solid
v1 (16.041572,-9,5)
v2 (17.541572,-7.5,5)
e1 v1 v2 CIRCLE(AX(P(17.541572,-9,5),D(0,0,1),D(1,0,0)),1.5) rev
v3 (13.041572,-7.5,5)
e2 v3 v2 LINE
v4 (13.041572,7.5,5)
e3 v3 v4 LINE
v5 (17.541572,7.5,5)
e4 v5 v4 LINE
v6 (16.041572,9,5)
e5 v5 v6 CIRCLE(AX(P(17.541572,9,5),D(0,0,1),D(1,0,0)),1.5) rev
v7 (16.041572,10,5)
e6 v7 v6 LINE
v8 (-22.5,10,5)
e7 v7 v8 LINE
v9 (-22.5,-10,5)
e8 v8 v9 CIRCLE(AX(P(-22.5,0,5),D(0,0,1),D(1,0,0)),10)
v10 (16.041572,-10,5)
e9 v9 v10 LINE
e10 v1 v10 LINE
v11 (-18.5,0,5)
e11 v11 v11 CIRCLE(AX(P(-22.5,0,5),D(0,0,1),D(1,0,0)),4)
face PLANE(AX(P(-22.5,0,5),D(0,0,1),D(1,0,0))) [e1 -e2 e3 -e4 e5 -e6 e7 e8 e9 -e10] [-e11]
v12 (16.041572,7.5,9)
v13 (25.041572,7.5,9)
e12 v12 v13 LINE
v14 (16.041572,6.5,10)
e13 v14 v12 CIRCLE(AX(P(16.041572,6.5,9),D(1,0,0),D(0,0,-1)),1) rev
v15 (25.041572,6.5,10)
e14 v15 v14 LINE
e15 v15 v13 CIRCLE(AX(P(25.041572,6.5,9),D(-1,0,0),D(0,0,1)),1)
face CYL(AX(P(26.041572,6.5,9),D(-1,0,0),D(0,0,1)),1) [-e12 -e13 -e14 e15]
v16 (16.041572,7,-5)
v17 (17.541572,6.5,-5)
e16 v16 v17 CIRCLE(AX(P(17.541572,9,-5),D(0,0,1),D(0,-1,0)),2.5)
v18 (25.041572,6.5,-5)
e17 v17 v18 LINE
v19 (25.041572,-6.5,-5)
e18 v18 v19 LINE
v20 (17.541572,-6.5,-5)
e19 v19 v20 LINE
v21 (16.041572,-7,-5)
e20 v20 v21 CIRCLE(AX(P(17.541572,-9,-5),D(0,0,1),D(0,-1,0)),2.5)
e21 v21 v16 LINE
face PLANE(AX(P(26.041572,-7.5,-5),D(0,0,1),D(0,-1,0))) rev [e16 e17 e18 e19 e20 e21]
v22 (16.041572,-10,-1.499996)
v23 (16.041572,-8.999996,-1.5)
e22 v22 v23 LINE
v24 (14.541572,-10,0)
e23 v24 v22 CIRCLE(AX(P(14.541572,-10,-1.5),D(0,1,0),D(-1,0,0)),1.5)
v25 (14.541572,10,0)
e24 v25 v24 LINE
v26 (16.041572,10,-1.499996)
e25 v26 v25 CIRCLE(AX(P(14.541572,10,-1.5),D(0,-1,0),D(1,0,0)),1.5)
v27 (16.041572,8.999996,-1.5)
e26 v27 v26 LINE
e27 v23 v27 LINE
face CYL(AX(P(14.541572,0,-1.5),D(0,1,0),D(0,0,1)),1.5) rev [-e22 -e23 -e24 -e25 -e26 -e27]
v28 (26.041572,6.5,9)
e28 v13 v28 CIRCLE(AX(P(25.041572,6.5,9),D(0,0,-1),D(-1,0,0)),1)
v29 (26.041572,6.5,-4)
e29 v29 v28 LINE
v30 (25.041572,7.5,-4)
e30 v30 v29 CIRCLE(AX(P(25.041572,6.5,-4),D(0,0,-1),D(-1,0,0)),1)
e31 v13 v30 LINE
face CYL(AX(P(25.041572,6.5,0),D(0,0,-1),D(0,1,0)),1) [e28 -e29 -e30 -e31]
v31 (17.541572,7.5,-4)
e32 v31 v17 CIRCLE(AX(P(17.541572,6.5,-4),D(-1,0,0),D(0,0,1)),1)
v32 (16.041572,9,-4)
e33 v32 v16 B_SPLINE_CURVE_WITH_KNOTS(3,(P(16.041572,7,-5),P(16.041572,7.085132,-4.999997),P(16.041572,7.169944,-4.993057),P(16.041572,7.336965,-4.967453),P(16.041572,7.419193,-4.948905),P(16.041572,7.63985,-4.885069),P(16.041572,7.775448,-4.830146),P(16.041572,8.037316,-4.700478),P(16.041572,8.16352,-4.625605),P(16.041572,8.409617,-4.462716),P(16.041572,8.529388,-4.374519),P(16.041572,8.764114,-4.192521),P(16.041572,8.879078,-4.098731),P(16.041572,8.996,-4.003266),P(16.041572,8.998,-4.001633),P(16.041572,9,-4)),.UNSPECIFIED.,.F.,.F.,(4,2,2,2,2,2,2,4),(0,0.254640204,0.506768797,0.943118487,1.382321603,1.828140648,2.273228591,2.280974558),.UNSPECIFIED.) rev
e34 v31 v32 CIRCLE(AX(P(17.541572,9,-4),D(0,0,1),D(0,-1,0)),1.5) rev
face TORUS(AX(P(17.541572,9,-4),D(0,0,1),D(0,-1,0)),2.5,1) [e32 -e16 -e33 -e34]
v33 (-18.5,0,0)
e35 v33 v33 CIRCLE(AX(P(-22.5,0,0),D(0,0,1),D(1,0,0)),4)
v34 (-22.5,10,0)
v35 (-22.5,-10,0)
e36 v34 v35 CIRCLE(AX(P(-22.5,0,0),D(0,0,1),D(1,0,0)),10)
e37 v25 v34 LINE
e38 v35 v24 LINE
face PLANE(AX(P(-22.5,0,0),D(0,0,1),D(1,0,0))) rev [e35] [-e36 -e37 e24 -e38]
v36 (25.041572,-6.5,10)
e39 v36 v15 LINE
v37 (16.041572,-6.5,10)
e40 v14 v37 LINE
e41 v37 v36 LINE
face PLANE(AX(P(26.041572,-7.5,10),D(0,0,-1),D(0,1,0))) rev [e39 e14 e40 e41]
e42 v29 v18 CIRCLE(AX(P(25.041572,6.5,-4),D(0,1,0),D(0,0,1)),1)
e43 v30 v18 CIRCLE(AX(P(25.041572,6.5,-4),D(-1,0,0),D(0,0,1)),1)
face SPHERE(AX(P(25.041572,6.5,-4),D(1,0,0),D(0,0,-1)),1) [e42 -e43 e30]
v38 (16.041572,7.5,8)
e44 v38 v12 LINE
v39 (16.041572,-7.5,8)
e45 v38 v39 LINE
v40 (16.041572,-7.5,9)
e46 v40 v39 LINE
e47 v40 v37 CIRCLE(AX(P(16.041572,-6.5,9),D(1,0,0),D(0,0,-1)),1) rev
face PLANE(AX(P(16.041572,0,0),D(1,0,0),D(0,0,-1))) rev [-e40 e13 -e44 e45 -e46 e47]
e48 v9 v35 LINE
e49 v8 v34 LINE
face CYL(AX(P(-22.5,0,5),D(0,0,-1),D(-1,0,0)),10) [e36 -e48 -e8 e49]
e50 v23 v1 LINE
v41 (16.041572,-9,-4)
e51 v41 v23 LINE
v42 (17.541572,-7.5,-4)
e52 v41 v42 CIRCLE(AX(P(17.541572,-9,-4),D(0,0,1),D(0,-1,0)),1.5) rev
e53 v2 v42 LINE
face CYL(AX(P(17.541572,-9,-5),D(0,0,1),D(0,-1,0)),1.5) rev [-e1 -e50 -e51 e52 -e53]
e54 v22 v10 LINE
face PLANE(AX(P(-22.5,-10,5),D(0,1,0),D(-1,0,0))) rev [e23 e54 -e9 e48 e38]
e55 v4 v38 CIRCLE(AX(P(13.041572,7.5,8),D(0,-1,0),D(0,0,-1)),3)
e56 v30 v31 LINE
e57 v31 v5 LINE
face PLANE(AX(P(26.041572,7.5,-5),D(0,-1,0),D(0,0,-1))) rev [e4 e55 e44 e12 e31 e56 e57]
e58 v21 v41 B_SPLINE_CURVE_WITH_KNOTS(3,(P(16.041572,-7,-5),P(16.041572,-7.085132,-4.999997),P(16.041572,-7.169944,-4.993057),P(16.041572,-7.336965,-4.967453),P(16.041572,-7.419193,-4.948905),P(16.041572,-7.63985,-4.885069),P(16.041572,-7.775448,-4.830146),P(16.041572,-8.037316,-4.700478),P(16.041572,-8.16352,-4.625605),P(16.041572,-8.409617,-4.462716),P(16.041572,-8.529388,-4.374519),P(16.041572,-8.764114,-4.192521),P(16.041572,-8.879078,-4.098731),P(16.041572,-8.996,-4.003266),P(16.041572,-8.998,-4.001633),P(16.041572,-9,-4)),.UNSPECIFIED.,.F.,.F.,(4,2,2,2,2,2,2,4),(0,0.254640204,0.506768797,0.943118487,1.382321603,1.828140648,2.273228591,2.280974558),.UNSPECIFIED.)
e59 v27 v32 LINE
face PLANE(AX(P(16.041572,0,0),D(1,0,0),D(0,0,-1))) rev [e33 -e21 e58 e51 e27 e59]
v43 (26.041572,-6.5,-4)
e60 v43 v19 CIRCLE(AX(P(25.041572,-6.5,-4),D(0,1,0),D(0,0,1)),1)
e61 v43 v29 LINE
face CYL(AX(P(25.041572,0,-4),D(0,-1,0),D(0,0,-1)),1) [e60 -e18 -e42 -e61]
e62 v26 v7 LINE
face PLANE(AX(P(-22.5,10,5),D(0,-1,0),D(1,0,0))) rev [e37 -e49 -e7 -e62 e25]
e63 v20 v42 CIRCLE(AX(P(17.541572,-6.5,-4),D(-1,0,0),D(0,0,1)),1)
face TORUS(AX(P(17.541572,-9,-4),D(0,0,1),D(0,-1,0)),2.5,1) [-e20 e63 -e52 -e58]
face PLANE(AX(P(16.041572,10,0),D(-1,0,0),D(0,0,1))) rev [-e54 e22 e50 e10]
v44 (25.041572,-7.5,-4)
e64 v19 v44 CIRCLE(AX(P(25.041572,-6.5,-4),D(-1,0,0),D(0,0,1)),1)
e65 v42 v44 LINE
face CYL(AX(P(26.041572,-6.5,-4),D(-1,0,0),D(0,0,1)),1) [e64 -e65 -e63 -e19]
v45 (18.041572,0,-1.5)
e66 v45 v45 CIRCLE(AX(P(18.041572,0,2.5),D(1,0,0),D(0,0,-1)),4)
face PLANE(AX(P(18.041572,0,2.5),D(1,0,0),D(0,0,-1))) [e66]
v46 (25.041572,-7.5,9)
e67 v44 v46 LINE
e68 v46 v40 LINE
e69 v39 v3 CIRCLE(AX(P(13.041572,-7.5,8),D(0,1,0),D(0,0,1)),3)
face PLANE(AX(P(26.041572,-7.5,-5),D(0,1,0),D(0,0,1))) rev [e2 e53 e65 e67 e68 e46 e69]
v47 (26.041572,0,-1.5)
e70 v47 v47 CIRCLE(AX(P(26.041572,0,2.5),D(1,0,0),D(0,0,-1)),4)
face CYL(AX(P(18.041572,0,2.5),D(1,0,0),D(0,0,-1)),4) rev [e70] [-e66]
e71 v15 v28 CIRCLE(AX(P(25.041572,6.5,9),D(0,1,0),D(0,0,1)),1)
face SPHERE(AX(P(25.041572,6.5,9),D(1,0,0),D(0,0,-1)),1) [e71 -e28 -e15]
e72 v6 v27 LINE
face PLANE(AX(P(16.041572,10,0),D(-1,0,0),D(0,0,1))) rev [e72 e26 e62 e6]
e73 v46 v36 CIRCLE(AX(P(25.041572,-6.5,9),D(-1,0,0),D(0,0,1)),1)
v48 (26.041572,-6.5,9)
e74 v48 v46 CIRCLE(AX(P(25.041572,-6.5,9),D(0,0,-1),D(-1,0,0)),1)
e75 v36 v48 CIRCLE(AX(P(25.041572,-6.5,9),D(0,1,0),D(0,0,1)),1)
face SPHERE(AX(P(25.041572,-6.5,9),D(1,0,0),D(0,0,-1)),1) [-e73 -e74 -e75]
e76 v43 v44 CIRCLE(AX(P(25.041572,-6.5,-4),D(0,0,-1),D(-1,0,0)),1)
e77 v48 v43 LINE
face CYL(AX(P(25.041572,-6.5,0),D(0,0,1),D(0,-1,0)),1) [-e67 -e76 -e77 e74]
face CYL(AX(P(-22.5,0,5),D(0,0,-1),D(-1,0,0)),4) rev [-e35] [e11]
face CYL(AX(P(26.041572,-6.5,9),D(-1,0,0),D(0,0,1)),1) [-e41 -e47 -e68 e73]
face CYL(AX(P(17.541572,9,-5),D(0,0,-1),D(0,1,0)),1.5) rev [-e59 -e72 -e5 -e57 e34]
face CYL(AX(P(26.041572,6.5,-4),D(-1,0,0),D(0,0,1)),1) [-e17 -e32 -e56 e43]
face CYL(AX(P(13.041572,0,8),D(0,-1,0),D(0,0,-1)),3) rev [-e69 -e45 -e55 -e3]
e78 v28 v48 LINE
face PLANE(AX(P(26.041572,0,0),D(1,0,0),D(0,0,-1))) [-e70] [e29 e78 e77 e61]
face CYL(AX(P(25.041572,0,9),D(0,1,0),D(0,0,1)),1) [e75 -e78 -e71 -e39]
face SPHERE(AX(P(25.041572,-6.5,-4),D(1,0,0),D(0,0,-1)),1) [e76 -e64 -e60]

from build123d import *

# Parameters (mm, degrees)
SKETCH1_R           = 4
BOSS_EXTRUDE1_DEPTH = 5
SKETCH2_W           = 25.16319253
SKETCH2_H           = 20
CUT_EXTRUDE1_DEPTH  = 35.369317712
SKETCH3_W           = 15
SKETCH3_H           = 15
BOSS_EXTRUDE2_DEPTH = 10
FILLET1_R           = 1.5
FILLET2_R           = 3
SKETCH4_R           = 4
CUT_EXTRUDE2_DEPTH  = 8
FILLET3_R           = 1
FILLET4_R           = 1


with BuildPart() as part:
    # Sketch1 → Boss-Extrude1 (new body)
    with BuildSketch(Plane.XY):
        with BuildLine():
            Line((-22.5, 10), (22.5, 10))
            ThreePointArc((22.5, 10), (32.5, 0), (22.5, -10))
            Line((22.5, -10), (-22.5, -10))
            ThreePointArc((-22.5, -10), (-32.5, 0), (-22.5, 10))
        make_face()
        with Locations((-22.5, 0)):
            Circle(SKETCH1_R, mode=Mode.SUBTRACT)
        with Locations((22.5, 0)):
            Circle(SKETCH1_R, mode=Mode.SUBTRACT)
    extrude(amount=BOSS_EXTRUDE1_DEPTH)

    # Sketch2 → Cut-Extrude1 (cut, through all)
    with BuildSketch(Plane.XY.offset(5)):
        with Locations((28.623168012, 0)):
            Rectangle(SKETCH2_W, SKETCH2_H)
    extrude(amount=-CUT_EXTRUDE1_DEPTH, mode=Mode.SUBTRACT)

    # Sketch3 → Boss-Extrude2 (add)
    with BuildSketch(Plane(origin=(16.041571747, 0, 0), x_dir=(0, 0, -1), z_dir=(1, 0, 0))):
        with Locations((-2.5, 0)):
            Rectangle(SKETCH3_W, SKETCH3_H)
    extrude(amount=BOSS_EXTRUDE2_DEPTH)

    # Fillet1
    # the kernel refuses this fillet: 1.5 mm, written as the material it adds along each edge
    with BuildSketch(Plane(origin=(16.041571747, 11.25, 0), x_dir=(-1, 0, 0), z_dir=(0, -1, 0))) as fillet1_piece_1_section:
        with BuildLine():
            CenterArc((FILLET1_R, FILLET1_R), FILLET1_R, 180, 90)
            Line((0, FILLET1_R), (0, 0))
            Line((0, 0), (FILLET1_R, 0))
        make_face()
    fillet1_piece_1 = extrude(amount=22.5, mode=Mode.PRIVATE)
    fillet1_piece_1 = split(fillet1_piece_1, bisect_by=Plane(origin=(16.041571747, 10, 0), z_dir=(0, -1, 0)), keep=Keep.TOP, mode=Mode.PRIVATE)
    fillet1_piece_1 = split(fillet1_piece_1, bisect_by=Plane(origin=(16.041571747, -10, 0), z_dir=(0, 1, 0)), keep=Keep.TOP, mode=Mode.PRIVATE)
    add(fillet1_piece_1)
    # the kernel refuses this fillet: 1.5 mm, written as the material it adds along each edge
    with BuildSketch(Plane(origin=(16.041571747, 7.5, 5), x_dir=(1, 0, 0), z_dir=(0, 0, -1))) as fillet1_2_piece_1_section:
        with BuildLine():
            CenterArc((FILLET1_R, -FILLET1_R), FILLET1_R, 90, 90)
            Line((0, -FILLET1_R), (0, 0))
            Line((0, 0), (FILLET1_R, 0))
        make_face()
    fillet1_2_piece_1 = extrude(amount=10.25, mode=Mode.PRIVATE)
    fillet1_2_piece_1 = split(fillet1_2_piece_1, bisect_by=Plane(origin=(16.041571747, 7.5, -5), z_dir=(0, 0, 1)), keep=Keep.TOP, mode=Mode.PRIVATE)
    add(fillet1_2_piece_1)
    # the kernel refuses this fillet: 1.5 mm, written as the material it adds along each edge
    with BuildSketch(Plane(origin=(16.041571747, -7.5, -5.25), x_dir=(1, 0, 0), z_dir=(0, 0, 1))) as fillet1_3_piece_1_section:
        with BuildLine():
            CenterArc((FILLET1_R, -FILLET1_R), FILLET1_R, 90, 90)
            Line((0, -FILLET1_R), (0, 0))
            Line((0, 0), (FILLET1_R, 0))
        make_face()
    fillet1_3_piece_1 = extrude(amount=10.25, mode=Mode.PRIVATE)
    fillet1_3_piece_1 = split(fillet1_3_piece_1, bisect_by=Plane(origin=(16.041571747, -7.5, -5), z_dir=(0, 0, 1)), keep=Keep.TOP, mode=Mode.PRIVATE)
    add(fillet1_3_piece_1)

    # Fillet2
    fillet2_edges = [part.edges().sort_by_distance(p)[0] for p in [
        (16.041571747, 0, 5),
    ]]
    fillet(fillet2_edges, radius=FILLET2_R)

    # Sketch4 → Cut-Extrude2 (cut)
    with BuildSketch(Plane(origin=(26.041571747, 0, 0), x_dir=(0, 0, -1), z_dir=(1, 0, 0))):
        with Locations((-2.5, 0)):
            Circle(SKETCH4_R)
    extrude(amount=-CUT_EXTRUDE2_DEPTH, mode=Mode.SUBTRACT)

    # Fillet3
    fillet3_edges = [part.edges().sort_by_distance(p)[0] for p in [
        (21.791571747, -7.5, -5),
        (21.791571747, 7.5, -5),
        (21.041571747, 7.5, 10),
        (21.041571747, -7.5, 10),
        (16.480911575, 7.939339828, -5),
        (16.480911575, -7.939339828, -5),
    ]]
    fillet(fillet3_edges, radius=FILLET3_R)

    # Fillet4
    fillet4_edges = [part.edges().sort_by_distance(p)[0] for p in [
        (26.041571747, 0, -5),
        (26.041571747, -7.5, 2.5),
        (26.041571747, 7.5, 2.5),
        (26.041571747, 0, 10),
        (26.041571747, 7.207106781, -4.707106781),
        (26.041571747, 7.207106781, 9.707106781),
        (26.041571747, -7.207106781, 9.707106781),
        (26.041571747, -7.207106781, -4.707106781),
    ]]
    fillet(fillet4_edges, radius=FILLET4_R)


solid = part.part
